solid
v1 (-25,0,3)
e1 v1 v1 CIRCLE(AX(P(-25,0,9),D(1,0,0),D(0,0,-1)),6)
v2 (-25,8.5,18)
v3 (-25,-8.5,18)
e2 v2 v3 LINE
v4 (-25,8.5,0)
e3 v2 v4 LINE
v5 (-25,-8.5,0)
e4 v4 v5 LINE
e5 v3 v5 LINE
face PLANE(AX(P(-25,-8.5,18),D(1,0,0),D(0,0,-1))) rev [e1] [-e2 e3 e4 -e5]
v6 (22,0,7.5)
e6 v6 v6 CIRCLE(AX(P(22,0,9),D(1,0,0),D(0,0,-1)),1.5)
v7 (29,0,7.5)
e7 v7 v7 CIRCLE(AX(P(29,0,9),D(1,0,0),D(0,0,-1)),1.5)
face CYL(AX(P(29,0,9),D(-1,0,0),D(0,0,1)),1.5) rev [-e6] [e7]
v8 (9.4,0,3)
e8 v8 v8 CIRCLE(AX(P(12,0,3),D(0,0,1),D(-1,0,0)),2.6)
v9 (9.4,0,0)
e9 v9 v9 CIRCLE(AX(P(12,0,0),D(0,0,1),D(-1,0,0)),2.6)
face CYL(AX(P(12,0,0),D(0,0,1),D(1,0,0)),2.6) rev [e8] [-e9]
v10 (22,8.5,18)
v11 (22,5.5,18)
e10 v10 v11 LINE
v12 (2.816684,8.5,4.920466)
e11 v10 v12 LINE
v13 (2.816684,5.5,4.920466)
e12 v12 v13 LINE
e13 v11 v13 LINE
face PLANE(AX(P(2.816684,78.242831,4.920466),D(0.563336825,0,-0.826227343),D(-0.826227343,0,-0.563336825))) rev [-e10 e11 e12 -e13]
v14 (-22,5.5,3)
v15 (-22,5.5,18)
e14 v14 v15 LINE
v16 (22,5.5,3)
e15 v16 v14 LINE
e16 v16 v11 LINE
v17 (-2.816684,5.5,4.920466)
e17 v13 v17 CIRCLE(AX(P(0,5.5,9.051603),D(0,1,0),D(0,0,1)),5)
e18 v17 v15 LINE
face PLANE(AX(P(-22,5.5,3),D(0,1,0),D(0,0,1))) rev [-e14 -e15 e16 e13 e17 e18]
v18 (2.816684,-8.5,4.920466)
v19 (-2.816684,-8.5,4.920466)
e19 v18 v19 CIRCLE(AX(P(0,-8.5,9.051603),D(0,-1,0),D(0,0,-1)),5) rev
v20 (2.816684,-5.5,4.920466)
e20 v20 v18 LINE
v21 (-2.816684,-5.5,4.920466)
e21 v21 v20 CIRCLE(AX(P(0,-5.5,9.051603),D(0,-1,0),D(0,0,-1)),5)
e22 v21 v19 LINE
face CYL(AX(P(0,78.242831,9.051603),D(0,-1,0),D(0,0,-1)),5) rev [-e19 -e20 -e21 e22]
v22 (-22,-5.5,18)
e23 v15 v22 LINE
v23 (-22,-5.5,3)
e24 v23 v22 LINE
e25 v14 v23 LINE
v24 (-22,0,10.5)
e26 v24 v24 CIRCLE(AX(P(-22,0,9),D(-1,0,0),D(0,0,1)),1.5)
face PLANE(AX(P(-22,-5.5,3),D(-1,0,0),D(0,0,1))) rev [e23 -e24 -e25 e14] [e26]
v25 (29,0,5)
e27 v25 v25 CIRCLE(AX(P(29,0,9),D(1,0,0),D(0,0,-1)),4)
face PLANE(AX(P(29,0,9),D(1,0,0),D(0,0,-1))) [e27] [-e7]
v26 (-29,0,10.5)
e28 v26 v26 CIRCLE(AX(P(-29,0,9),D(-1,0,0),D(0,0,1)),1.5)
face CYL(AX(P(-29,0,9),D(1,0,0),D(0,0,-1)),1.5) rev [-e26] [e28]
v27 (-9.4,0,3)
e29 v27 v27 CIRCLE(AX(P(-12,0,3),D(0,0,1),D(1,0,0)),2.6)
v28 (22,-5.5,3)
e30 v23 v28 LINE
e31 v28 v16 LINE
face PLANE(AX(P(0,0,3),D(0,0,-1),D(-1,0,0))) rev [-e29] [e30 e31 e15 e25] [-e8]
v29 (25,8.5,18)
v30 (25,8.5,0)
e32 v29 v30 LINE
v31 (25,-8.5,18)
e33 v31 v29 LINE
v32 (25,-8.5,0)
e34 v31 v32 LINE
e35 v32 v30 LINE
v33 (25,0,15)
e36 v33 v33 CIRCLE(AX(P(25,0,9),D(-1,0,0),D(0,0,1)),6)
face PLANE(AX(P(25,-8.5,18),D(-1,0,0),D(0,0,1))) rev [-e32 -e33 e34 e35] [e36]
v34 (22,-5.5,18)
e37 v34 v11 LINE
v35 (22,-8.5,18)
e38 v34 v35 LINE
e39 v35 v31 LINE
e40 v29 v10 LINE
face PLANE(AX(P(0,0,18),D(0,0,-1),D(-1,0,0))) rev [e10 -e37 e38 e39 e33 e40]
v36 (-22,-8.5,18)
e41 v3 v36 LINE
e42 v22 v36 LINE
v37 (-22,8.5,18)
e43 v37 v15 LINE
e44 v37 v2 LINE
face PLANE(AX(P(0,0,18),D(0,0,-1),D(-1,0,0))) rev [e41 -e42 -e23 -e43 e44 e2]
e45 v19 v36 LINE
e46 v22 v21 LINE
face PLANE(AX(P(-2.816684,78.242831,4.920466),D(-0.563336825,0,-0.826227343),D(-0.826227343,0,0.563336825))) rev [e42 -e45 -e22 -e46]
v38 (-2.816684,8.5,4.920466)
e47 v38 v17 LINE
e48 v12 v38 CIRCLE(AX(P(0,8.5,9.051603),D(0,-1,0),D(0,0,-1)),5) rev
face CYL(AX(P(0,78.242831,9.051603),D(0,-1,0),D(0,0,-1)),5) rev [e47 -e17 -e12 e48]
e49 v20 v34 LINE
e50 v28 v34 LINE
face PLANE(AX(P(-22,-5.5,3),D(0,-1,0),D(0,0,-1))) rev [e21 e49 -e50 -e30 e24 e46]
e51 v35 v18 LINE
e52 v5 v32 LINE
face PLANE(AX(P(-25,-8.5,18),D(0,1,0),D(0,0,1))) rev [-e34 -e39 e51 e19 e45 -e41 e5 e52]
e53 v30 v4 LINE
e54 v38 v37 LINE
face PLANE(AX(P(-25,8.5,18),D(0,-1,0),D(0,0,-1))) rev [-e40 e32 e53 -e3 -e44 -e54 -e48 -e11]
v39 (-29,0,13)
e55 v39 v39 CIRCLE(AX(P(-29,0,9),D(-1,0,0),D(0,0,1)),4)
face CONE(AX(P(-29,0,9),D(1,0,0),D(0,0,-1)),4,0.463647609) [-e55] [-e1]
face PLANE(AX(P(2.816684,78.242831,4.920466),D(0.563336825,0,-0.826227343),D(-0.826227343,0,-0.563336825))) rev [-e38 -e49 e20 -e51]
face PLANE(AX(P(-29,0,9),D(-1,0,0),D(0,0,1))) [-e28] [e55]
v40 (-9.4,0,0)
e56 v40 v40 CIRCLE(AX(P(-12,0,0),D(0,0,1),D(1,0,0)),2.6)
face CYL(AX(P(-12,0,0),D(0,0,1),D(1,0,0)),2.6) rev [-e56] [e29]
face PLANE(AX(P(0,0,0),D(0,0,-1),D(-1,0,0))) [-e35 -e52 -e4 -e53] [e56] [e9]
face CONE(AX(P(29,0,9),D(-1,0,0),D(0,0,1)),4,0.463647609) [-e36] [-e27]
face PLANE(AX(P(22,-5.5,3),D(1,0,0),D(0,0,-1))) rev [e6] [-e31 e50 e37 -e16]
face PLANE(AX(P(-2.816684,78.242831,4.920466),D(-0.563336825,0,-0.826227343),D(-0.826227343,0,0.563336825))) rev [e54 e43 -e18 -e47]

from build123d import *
from OCP.BRepFilletAPI import BRepFilletAPI_MakeChamfer

# Parameters (mm, degrees)
SKETCH_1_W               = 50
SKETCH_1_H               = 17
EXTRUDE_1_DEPTH          = 18
SKETCH_2_W               = 44
SKETCH_2_H               = 11
CUT_EXTRUDE_1_DEPTH      = 15
CUT_EXTRUDE_2_DEPTH      = 36.185224172
CUT_EXTRUDE_2_DEPTH_BACK = 17
SKETCH_4_R               = 2.6
CUT_EXTRUDE_4_DEPTH      = 3
SKETCH_5_R               = 4
SKETCH_5_R_2             = 1.5
EXTRUDE_2_DEPTH          = 4
EXTRUDE_START            = 4
SKETCH_6_R               = 4
SKETCH_6_R_2             = 1.5
EXTRUDE_3_DEPTH          = 4
CHAMFER_1_SIZE           = 2
CHAMFER_1_SIZE_2         = 4
CUT_EXTRUDE_START        = -50
SKETCH_7_R               = 1.5
CUT_EXTRUDE_5_DEPTH      = 50


with BuildPart() as part:
    # 草图1 → 凸台-拉伸1 (new body)
    with BuildSketch(Plane.XY):
        Rectangle(SKETCH_1_W, SKETCH_1_H)
    extrude(amount=EXTRUDE_1_DEPTH)

    # 草图2 → 切除-拉伸1 (cut)
    with BuildSketch(Plane.XY.offset(18)):
        Rectangle(SKETCH_2_W, SKETCH_2_H)
    extrude(amount=-CUT_EXTRUDE_1_DEPTH, mode=Mode.SUBTRACT)

    # 草图3 → 切除-拉伸2 (cut, two sides: drawn at the far end of the back side and taken through both)
    with BuildSketch(Plane(origin=(0, 8.5, 0), x_dir=(1, 0, 0), z_dir=(0, 1, 0)).offset(-CUT_EXTRUDE_2_DEPTH_BACK)):
        with BuildLine():
            Line((-113.428530012, -80.337634099), (-22, -18))
            Line((-22, -18), (-2.816684123, -4.920466448))
            ThreePointArc((-2.816684123, -4.920466448), (0, -4.051603162), (2.816684123, -4.920466448))
            Line((2.816684123, -4.920466448), (22, -18))
            Line((22, -18), (113.428530012, -80.337634099))
            Line((113.428530012, -80.337634099), (113.428530012, -301.653306613))
            Line((113.428530012, -301.653306613), (-113.428530012, -301.653306613))
            Line((-113.428530012, -301.653306613), (-113.428530012, -80.337634099))
        make_face()
    extrude(amount=CUT_EXTRUDE_2_DEPTH + CUT_EXTRUDE_2_DEPTH_BACK, mode=Mode.SUBTRACT)

    # 草图4 → 切除-拉伸4 (cut)
    with BuildSketch(Plane.XY.offset(3)):
        with Locations((-12, 0)):
            Circle(SKETCH_4_R)
        with Locations(Location((12, 0, 0), (0, 0, 180))):
            Circle(SKETCH_4_R)
    extrude(amount=-CUT_EXTRUDE_4_DEPTH, mode=Mode.SUBTRACT)

    # 草图5 → 凸台-拉伸2 (add)
    with BuildSketch(Plane.ZY.offset(25)):
        with Locations(Location((9, 0, 0), (0, 0, 180))):
            Circle(SKETCH_5_R)
        with Locations((9, 0)):
            Circle(SKETCH_5_R_2, mode=Mode.SUBTRACT)
    extrude(amount=EXTRUDE_2_DEPTH)

    # 草图6 → 凸台-拉伸3 (add)
    with BuildSketch(Plane(origin=(25, 0, 0), x_dir=(0, 0, -1), z_dir=(1, 0, 0)).offset(EXTRUDE_START)):
        with Locations((-9, 0)):
            Circle(SKETCH_6_R)
        with Locations(Location((-9, 0, 0), (0, 0, 180))):
            Circle(SKETCH_6_R_2, mode=Mode.SUBTRACT)
    extrude(amount=-EXTRUDE_3_DEPTH)

    # 倒角1
    chamfer_1_edges_1 = [part.edges().sort_by_distance(p)[0] for p in [
        (-25, 0, 13),
    ]]
    chamfer_1_side_1 = [part.faces().sort_by_distance(p)[0] for p in [
        (-25, 0, 13.04),
    ]]
    chamfer_1_edges_2 = [part.edges().sort_by_distance(p)[0] for p in [
        (25, 0, 13),
    ]]
    chamfer_1_side_2 = [part.faces().sort_by_distance(p)[0] for p in [
        (25, 0, 13.04),
    ]]
    chamfer_1 = BRepFilletAPI_MakeChamfer(part.part.solid().wrapped)
    for e in chamfer_1_edges_1:
        chamfer_1.Add(CHAMFER_1_SIZE - 0.0001, CHAMFER_1_SIZE_2 - 0.0001, e.wrapped, chamfer_1_side_1[0].wrapped)
    for e in chamfer_1_edges_2:
        chamfer_1.Add(CHAMFER_1_SIZE - 0.0001, CHAMFER_1_SIZE_2 - 0.0001, e.wrapped, chamfer_1_side_2[0].wrapped)
    add(Compound.cast(chamfer_1.Shape()), mode=Mode.REPLACE)  # a hair under: the kernel refuses the full size

    # 草图7 → 切除-拉伸5 (cut)
    with BuildSketch(Plane.ZY.offset(25).offset(CUT_EXTRUDE_START)):
        with Locations((9, 0)):
            Circle(SKETCH_7_R)
    extrude(amount=CUT_EXTRUDE_5_DEPTH, mode=Mode.SUBTRACT)


solid = part.part
